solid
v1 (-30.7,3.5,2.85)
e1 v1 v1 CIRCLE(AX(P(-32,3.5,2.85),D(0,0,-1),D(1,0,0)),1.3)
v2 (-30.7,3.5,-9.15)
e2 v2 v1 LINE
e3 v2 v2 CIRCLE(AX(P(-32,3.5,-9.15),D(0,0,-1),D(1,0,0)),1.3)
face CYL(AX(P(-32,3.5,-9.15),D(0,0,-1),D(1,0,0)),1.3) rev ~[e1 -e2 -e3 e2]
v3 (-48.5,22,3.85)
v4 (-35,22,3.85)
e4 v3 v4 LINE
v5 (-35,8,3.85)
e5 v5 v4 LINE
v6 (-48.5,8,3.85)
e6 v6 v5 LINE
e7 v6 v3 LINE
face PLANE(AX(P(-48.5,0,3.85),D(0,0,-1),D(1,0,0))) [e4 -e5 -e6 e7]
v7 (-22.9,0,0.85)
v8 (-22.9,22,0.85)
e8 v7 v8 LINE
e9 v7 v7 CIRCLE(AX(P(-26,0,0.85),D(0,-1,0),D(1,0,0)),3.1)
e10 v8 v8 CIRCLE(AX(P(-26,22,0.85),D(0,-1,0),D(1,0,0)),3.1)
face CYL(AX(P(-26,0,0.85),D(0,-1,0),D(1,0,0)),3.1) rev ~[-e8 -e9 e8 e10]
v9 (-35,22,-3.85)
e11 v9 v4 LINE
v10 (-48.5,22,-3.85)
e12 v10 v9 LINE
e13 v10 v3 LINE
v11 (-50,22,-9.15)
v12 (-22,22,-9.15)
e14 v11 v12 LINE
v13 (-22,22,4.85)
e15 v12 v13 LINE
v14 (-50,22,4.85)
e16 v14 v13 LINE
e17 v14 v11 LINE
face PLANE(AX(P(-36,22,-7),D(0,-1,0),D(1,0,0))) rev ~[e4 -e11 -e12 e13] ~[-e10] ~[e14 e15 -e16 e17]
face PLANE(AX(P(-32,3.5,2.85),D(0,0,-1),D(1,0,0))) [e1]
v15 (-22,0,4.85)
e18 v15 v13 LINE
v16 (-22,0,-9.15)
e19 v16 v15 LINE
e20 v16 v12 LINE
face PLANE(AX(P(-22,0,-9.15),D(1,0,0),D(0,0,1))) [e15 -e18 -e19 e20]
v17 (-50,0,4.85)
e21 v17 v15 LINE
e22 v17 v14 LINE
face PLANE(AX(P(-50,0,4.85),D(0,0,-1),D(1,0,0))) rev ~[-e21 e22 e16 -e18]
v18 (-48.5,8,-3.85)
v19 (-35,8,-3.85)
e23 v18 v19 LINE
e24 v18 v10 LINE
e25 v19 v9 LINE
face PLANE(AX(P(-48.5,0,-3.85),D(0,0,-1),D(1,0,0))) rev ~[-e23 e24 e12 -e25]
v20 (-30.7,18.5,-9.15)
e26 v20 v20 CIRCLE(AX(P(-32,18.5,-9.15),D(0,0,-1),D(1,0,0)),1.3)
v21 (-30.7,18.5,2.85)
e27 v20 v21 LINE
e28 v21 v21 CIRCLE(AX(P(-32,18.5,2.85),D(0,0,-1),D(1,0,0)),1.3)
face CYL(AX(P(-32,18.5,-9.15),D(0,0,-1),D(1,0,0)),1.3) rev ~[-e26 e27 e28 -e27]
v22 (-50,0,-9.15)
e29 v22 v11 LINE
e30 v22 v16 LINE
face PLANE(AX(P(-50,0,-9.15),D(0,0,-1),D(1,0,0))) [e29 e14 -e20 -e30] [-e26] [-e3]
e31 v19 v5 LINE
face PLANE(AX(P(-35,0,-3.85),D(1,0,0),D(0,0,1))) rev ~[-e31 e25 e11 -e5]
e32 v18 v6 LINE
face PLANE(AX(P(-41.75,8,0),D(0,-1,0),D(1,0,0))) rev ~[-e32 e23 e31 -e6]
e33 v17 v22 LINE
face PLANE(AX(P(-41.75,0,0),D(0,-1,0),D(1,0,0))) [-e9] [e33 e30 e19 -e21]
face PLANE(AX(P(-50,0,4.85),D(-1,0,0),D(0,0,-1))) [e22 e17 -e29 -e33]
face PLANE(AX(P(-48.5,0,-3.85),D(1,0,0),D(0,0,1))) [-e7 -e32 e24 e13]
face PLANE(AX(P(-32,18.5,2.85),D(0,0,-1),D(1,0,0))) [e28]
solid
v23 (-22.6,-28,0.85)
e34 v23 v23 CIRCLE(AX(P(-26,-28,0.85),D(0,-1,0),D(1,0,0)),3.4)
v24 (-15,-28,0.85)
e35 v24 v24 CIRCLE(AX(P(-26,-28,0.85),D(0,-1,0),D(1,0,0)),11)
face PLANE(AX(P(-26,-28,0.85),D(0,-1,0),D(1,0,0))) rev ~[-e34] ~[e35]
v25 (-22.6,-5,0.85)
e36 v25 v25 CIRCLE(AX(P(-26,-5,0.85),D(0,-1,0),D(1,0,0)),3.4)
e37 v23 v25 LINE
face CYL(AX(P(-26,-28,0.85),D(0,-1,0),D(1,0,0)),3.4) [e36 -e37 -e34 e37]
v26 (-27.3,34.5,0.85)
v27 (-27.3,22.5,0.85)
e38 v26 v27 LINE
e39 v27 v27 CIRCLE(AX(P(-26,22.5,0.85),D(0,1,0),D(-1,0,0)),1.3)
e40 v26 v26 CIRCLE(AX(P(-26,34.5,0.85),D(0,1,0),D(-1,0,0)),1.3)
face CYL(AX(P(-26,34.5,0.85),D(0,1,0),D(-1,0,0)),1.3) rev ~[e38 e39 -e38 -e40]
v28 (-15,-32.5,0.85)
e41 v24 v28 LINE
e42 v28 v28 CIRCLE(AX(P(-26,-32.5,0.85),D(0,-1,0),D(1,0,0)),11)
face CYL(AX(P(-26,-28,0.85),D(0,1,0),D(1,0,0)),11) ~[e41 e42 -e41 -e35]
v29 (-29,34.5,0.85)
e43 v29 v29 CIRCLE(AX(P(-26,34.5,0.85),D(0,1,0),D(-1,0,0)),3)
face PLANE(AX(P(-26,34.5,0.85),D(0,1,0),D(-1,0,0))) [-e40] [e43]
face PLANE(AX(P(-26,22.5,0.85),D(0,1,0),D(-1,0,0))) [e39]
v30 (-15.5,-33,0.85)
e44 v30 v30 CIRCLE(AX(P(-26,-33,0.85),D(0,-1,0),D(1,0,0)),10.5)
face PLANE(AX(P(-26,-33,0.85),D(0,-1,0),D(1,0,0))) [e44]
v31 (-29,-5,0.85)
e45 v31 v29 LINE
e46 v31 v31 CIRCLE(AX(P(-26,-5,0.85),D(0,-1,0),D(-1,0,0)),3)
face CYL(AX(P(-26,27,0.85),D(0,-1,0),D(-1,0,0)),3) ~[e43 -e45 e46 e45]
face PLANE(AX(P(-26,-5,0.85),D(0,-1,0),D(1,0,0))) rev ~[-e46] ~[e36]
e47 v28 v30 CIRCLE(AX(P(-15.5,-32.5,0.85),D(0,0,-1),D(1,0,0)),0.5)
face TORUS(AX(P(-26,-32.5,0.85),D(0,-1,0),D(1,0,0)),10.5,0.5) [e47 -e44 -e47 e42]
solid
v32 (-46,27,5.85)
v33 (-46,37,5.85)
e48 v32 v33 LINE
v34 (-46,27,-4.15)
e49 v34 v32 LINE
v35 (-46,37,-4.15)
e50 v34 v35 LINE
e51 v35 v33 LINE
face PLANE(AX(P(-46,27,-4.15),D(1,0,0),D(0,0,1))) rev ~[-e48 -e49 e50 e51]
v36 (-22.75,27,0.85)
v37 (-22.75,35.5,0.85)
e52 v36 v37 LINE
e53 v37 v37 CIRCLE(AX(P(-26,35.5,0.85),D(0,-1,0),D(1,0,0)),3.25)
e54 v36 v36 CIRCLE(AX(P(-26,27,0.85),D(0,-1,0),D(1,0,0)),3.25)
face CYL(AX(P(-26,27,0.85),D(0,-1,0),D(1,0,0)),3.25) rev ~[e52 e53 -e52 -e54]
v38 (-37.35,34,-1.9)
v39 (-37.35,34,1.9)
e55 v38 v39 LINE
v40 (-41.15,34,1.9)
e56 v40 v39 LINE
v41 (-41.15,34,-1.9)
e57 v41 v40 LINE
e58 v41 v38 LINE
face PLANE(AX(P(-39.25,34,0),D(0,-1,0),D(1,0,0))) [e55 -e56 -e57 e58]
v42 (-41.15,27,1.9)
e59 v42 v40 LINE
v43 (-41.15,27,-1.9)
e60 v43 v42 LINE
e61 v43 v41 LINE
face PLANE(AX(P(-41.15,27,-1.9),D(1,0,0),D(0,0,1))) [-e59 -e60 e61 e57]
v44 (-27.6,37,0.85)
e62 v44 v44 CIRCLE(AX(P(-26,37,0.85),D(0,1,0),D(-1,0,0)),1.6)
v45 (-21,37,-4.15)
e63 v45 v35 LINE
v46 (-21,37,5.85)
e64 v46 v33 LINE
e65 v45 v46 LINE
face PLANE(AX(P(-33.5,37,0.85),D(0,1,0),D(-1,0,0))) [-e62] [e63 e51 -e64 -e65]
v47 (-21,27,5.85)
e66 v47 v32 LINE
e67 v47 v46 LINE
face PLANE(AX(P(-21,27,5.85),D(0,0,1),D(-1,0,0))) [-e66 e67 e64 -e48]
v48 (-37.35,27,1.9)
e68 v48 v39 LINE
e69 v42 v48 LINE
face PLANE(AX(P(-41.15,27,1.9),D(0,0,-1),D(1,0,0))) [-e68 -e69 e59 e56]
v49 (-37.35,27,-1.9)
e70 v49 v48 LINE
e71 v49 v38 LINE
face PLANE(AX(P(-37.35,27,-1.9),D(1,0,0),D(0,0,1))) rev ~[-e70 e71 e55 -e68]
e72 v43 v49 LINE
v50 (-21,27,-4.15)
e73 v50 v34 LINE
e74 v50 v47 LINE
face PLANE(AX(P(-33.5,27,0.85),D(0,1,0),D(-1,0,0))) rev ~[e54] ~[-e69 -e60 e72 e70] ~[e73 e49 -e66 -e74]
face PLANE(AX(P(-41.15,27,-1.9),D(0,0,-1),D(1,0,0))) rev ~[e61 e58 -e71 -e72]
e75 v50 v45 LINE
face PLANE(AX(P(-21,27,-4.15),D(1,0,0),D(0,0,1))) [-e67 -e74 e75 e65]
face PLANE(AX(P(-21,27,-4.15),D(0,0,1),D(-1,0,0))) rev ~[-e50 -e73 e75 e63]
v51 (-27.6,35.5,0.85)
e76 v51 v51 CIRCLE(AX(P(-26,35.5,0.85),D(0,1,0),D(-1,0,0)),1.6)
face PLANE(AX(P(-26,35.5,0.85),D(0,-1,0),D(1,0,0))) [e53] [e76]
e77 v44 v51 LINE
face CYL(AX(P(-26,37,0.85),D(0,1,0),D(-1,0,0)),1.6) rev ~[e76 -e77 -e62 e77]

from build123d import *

# Parameters (mm, degrees)
F0_W      = 28
F0_H      = 4.3
F0_H_2    = 9.7
F0_W_2    = 13.5
F0_H_3    = 7.7
F0_R      = 3.1
F1_DEPTH  = 22
F2_W      = 13.5
F2_H      = 7.7
F3_DEPTH  = 8
F4_R      = 1.3
F5_DEPTH  = 12
F8_R      = 11
F9_DEPTH  = 5
F10_R     = 3
F11_DEPTH = 55
F12_W     = 25
F12_H     = 10
F13_DEPTH = 10
F14_W     = 3.8
F14_H     = 3.8
F15_DEPTH = 7
F14_R     = 3.25
F16_DEPTH = 8.5
F17_R     = 3.4
F18_DEPTH = 23
F19_R     = 3
F20_DEPTH = 7.5
F21_R     = 1.3
F22_DEPTH = 12
F23_R     = 1.6
F24_DEPTH = 25
F25_R     = 0.5


with BuildPart() as f1:
    # F0 (on Front) → F1 (new body)
    with BuildSketch(Plane.XZ):
        with Locations((-36, -7)):
            Rectangle(F0_W, F0_H)
        with Locations((-36, 0)):
            Rectangle(F0_W, F0_H_2)
        with Locations((-41.75, 0)):
            Rectangle(F0_W_2, F0_H_3, mode=Mode.SUBTRACT)
        with Locations((-26, 0.85)):
            Circle(F0_R, mode=Mode.SUBTRACT)
    extrude(amount=-F1_DEPTH)

    # F2 (on face) → F3 (join)
    with BuildSketch(Plane.XZ):
        with Locations((-41.75, 0)):
            Rectangle(F2_W, F2_H)
    extrude(amount=-F3_DEPTH)

    # F4 (on face) → F5 (cut)
    with BuildSketch(Plane(origin=(0, 0, -9.15), x_dir=(1, 0, 0), z_dir=(0, 0, -1))):
        with Locations((-32, -3.5)):
            Circle(F4_R)
        with Locations((-32, -18.5)):
            Circle(F4_R)
    extrude(amount=-F5_DEPTH, mode=Mode.SUBTRACT)


with BuildPart() as f9:
    # F8 (on offset) → F9 (new body)
    with BuildSketch(Plane.XZ.offset(28)):
        with Locations((-26, 0.85)):
            Circle(F8_R)
    extrude(amount=F9_DEPTH)

    # F10 (on face) → F11 (join)
    with BuildSketch(Plane(origin=(0, -28, 0), x_dir=(-1, 0, 0), z_dir=(0, 1, 0))):
        with Locations((26, 0.85)):
            Circle(F10_R)
    extrude(amount=F11_DEPTH)

    # F17 (on face) → F18 (join)
    with BuildSketch(Plane.XZ.offset(28)):
        with Locations((-26, 0.85)):
            Circle(F17_R)
    extrude(amount=-F18_DEPTH)

    # F19 (on face) → F20 (join)
    with BuildSketch(Plane(origin=(0, 27, 0), x_dir=(-1, 0, 0), z_dir=(0, 1, 0))):
        with Locations((26, 0.85)):
            Circle(F19_R)
    extrude(amount=F20_DEPTH)

    # F21 (on face) → F22 (cut)
    with BuildSketch(Plane(origin=(0, 34.5, 0), x_dir=(-1, 0, 0), z_dir=(0, 1, 0))):
        with Locations((26, 0.85)):
            Circle(F21_R)
    extrude(amount=-F22_DEPTH, mode=Mode.SUBTRACT)

    # F25
    f25_edges = [f9.edges().sort_by_distance(p)[0] for p in [
        (-37, -33, 0.85),
    ]]
    fillet(f25_edges, radius=F25_R)


with BuildPart() as f13:
    # F12 (on offset) → F13 (new body)
    with BuildSketch(Plane(origin=(0, 27, 0), x_dir=(-1, 0, 0), z_dir=(0, 1, 0))):
        with Locations((33.5, 0.85)):
            Rectangle(F12_W, F12_H)
    extrude(amount=F13_DEPTH)

    # F14 (on face) → F15 (cut)
    with BuildSketch(Plane.XZ.offset(-27)):
        with Locations((-39.25, 0)):
            Rectangle(F14_W, F14_H)
    extrude(amount=-F15_DEPTH, mode=Mode.SUBTRACT)

    # F14 (on face) → F16 (cut)
    with BuildSketch(Plane.XZ.offset(-27)):
        with Locations((-26, 0.85)):
            Circle(F14_R)
    extrude(amount=-F16_DEPTH, mode=Mode.SUBTRACT)

    # F23 (on face) → F24 (cut)
    with BuildSketch(Plane(origin=(0, 37, 0), x_dir=(-1, 0, 0), z_dir=(0, 1, 0))):
        with Locations((26, 0.85)):
            Circle(F23_R)
    extrude(amount=-F24_DEPTH, mode=Mode.SUBTRACT)


solid = Compound([f1.part, f9.part, f13.part])
